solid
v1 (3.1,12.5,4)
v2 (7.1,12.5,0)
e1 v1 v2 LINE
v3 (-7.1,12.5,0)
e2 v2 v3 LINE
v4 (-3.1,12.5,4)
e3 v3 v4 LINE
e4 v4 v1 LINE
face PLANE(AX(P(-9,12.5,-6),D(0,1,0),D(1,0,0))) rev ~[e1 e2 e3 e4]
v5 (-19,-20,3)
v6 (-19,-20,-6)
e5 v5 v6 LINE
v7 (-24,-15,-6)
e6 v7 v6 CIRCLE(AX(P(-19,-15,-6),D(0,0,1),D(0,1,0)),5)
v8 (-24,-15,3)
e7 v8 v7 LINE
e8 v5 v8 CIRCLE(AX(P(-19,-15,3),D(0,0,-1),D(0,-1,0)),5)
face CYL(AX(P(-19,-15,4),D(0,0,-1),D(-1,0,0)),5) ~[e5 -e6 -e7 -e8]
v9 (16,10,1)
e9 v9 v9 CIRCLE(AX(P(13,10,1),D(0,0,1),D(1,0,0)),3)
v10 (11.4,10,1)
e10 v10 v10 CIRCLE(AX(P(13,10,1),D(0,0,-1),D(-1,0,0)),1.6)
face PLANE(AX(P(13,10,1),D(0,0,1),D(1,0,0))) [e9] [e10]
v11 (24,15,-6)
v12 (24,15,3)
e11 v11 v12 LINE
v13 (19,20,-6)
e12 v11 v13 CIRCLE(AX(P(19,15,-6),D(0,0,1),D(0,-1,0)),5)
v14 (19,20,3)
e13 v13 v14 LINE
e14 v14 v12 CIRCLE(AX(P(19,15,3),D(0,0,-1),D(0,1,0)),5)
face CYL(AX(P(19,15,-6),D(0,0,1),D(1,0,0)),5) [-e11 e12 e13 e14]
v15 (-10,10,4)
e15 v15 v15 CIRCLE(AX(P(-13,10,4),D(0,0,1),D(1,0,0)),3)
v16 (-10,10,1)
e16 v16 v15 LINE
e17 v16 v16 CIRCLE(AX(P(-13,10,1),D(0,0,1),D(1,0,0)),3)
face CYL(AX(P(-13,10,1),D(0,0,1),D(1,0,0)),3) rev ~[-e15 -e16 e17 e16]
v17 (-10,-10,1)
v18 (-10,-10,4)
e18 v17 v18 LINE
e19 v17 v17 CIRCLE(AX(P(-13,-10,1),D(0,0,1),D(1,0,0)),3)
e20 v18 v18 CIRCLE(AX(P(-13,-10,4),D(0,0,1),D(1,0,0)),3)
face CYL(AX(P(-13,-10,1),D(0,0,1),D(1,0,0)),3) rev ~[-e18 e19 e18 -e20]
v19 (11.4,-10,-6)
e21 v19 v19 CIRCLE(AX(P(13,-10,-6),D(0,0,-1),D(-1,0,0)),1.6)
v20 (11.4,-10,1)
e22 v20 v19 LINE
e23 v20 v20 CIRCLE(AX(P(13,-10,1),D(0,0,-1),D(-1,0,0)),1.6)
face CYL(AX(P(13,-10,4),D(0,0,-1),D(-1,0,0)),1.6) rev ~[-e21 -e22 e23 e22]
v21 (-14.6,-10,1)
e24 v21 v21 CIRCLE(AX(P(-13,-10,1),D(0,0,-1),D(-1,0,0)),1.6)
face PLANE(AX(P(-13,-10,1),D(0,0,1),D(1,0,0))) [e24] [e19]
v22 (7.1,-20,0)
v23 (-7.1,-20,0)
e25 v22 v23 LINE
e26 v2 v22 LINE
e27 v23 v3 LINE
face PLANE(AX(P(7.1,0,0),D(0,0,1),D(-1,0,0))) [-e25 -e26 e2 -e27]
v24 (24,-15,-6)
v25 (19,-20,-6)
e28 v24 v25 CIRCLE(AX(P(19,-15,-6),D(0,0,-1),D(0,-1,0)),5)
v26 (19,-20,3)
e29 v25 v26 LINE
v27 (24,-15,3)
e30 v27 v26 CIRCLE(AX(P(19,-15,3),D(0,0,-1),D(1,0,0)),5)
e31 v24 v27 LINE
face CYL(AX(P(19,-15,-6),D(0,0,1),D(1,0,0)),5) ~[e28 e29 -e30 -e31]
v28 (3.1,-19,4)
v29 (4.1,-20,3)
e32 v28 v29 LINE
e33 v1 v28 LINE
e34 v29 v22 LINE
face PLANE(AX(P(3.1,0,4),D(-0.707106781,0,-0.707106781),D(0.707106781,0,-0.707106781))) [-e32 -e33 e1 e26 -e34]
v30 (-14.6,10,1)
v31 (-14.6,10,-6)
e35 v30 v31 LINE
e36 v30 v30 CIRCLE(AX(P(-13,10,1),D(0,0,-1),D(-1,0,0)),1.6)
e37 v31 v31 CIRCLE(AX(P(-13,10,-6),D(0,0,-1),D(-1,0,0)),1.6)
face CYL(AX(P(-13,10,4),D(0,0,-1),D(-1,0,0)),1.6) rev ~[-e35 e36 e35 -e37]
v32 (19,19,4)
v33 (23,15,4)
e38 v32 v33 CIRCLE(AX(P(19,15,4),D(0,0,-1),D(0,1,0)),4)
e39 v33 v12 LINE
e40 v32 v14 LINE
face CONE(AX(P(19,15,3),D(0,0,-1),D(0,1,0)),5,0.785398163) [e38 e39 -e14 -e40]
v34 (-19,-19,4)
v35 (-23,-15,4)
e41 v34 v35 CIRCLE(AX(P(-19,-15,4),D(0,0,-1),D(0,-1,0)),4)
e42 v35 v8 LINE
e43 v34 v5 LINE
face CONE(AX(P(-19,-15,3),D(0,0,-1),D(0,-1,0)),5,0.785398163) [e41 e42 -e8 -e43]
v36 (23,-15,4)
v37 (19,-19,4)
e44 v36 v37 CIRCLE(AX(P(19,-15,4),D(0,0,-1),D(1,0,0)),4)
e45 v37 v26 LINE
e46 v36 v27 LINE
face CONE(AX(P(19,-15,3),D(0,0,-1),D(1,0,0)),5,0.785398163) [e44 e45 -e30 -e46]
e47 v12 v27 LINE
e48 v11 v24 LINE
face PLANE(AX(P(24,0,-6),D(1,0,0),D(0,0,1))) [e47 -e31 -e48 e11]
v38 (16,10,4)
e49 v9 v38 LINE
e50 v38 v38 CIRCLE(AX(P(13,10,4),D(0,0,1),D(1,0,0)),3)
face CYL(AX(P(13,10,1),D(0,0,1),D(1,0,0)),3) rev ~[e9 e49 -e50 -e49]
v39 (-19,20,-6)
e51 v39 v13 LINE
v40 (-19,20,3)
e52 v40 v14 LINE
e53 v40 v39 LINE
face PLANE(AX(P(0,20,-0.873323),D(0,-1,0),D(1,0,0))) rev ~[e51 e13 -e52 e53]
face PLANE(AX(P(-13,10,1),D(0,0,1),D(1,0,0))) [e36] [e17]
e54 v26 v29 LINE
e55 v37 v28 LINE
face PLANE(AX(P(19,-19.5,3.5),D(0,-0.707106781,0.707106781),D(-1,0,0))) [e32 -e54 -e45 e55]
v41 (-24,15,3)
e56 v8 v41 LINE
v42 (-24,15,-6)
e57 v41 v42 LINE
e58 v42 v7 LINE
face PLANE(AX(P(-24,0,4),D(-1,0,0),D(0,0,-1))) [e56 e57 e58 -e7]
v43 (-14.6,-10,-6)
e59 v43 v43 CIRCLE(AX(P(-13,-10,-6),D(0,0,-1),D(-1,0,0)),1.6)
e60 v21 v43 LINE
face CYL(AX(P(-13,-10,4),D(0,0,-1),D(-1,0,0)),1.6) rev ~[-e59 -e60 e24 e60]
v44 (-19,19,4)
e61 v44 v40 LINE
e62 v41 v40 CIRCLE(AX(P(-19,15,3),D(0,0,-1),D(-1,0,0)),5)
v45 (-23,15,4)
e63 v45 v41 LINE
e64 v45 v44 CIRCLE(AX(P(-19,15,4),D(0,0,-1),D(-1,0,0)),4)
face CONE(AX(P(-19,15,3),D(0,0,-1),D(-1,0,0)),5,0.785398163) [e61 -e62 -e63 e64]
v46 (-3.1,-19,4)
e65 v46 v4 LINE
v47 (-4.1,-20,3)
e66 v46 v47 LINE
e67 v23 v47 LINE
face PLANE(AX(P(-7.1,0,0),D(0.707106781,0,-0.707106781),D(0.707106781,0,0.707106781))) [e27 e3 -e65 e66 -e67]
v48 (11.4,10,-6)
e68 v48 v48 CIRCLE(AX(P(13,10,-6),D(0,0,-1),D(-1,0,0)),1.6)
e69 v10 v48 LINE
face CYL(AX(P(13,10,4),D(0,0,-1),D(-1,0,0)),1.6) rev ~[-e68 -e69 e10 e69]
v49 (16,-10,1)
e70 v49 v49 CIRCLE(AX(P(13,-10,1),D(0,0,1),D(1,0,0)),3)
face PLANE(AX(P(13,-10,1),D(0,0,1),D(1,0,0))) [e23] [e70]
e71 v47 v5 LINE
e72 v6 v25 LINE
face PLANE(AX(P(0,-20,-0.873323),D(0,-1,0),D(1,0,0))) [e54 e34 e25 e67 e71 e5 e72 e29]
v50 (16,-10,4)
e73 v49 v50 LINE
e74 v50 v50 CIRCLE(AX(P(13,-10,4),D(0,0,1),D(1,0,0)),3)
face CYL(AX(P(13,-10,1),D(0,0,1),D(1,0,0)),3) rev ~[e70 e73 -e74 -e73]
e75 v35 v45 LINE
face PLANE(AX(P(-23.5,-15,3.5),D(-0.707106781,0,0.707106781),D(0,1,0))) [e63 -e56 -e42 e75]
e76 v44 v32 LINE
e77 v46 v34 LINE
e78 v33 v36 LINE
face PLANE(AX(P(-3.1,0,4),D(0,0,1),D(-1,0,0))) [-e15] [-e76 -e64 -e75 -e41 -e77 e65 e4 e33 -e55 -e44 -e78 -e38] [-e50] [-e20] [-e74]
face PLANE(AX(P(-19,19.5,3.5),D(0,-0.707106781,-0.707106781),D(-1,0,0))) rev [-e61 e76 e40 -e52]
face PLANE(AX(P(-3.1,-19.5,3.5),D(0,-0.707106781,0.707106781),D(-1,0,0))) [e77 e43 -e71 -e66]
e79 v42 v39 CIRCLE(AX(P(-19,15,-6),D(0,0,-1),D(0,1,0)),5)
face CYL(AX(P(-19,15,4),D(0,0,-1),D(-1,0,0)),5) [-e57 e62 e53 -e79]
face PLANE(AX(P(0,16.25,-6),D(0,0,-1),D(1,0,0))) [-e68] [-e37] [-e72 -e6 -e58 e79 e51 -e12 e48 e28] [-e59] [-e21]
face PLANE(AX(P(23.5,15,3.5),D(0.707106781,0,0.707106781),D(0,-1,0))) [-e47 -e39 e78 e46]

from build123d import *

# Parameters (mm, degrees)
F1_DEPTH       = 20
F2_R           = 5
F5_D           = 3.2
F5_CBORE_D     = 6
F5_CBORE_DEPTH = 3
F6_W           = 18
F6_H           = 7.5
F7_DEPTH       = 10
F8_SIZE        = 1


# Not quite as in the source:
# - a feature of the source that left no trace in its solid (it failed there, or was rolled back) is left out


with BuildPart() as f1:
    # F0 (on Front) → F1 (new body, symmetric)
    with BuildSketch(Plane.XZ):
        Polygon((-24, 4), (-24, 0), (-24, -6), (24, -6), (24, 0), (24, 4), (3.1, 4), (7.1, 0), (-7.1, 0), (-3.1, 4), align=None)
    extrude(amount=F1_DEPTH, both=True)

    # F2
    f2_edges = [f1.edges().sort_by_distance(p)[0] for p in [
        (-24, 20, -1),
        (24, 20, -1),
        (24, -20, -1),
        (-24, -20, -1),
    ]]
    fillet(f2_edges, radius=F2_R)

    # F5 (through all)
    with Locations(Plane.XY.offset(4)):
        with Locations((13, -10), (-13, -10), (13, 10), (-13, 10)):
            CounterBoreHole(F5_D / 2, F5_CBORE_D / 2, F5_CBORE_DEPTH)

    # F6 (on face) → F7 (join)
    with BuildSketch(Plane(origin=(0, 0, -6), x_dir=(1, 0, 0), z_dir=(0, 0, -1))):
        with Locations((0, -16.25)):
            Rectangle(F6_W, F6_H)
    extrude(amount=-F7_DEPTH)

    # F8
    f8_edges = [f1.edges().sort_by_distance(p)[0] for p in [
        (0, 20, 4),
        (-22.535534, 18.535534, 4),
        (-24, 0, 4),
        (-22.535534, -18.535534, 4),
        (-11.05, -20, 4),
        (11.05, -20, 4),
        (22.535534, -18.535534, 4),
        (24, 0, 4),
        (22.535534, 18.535534, 4),
    ]]
    chamfer(f8_edges, length=F8_SIZE)


solid = f1.part
